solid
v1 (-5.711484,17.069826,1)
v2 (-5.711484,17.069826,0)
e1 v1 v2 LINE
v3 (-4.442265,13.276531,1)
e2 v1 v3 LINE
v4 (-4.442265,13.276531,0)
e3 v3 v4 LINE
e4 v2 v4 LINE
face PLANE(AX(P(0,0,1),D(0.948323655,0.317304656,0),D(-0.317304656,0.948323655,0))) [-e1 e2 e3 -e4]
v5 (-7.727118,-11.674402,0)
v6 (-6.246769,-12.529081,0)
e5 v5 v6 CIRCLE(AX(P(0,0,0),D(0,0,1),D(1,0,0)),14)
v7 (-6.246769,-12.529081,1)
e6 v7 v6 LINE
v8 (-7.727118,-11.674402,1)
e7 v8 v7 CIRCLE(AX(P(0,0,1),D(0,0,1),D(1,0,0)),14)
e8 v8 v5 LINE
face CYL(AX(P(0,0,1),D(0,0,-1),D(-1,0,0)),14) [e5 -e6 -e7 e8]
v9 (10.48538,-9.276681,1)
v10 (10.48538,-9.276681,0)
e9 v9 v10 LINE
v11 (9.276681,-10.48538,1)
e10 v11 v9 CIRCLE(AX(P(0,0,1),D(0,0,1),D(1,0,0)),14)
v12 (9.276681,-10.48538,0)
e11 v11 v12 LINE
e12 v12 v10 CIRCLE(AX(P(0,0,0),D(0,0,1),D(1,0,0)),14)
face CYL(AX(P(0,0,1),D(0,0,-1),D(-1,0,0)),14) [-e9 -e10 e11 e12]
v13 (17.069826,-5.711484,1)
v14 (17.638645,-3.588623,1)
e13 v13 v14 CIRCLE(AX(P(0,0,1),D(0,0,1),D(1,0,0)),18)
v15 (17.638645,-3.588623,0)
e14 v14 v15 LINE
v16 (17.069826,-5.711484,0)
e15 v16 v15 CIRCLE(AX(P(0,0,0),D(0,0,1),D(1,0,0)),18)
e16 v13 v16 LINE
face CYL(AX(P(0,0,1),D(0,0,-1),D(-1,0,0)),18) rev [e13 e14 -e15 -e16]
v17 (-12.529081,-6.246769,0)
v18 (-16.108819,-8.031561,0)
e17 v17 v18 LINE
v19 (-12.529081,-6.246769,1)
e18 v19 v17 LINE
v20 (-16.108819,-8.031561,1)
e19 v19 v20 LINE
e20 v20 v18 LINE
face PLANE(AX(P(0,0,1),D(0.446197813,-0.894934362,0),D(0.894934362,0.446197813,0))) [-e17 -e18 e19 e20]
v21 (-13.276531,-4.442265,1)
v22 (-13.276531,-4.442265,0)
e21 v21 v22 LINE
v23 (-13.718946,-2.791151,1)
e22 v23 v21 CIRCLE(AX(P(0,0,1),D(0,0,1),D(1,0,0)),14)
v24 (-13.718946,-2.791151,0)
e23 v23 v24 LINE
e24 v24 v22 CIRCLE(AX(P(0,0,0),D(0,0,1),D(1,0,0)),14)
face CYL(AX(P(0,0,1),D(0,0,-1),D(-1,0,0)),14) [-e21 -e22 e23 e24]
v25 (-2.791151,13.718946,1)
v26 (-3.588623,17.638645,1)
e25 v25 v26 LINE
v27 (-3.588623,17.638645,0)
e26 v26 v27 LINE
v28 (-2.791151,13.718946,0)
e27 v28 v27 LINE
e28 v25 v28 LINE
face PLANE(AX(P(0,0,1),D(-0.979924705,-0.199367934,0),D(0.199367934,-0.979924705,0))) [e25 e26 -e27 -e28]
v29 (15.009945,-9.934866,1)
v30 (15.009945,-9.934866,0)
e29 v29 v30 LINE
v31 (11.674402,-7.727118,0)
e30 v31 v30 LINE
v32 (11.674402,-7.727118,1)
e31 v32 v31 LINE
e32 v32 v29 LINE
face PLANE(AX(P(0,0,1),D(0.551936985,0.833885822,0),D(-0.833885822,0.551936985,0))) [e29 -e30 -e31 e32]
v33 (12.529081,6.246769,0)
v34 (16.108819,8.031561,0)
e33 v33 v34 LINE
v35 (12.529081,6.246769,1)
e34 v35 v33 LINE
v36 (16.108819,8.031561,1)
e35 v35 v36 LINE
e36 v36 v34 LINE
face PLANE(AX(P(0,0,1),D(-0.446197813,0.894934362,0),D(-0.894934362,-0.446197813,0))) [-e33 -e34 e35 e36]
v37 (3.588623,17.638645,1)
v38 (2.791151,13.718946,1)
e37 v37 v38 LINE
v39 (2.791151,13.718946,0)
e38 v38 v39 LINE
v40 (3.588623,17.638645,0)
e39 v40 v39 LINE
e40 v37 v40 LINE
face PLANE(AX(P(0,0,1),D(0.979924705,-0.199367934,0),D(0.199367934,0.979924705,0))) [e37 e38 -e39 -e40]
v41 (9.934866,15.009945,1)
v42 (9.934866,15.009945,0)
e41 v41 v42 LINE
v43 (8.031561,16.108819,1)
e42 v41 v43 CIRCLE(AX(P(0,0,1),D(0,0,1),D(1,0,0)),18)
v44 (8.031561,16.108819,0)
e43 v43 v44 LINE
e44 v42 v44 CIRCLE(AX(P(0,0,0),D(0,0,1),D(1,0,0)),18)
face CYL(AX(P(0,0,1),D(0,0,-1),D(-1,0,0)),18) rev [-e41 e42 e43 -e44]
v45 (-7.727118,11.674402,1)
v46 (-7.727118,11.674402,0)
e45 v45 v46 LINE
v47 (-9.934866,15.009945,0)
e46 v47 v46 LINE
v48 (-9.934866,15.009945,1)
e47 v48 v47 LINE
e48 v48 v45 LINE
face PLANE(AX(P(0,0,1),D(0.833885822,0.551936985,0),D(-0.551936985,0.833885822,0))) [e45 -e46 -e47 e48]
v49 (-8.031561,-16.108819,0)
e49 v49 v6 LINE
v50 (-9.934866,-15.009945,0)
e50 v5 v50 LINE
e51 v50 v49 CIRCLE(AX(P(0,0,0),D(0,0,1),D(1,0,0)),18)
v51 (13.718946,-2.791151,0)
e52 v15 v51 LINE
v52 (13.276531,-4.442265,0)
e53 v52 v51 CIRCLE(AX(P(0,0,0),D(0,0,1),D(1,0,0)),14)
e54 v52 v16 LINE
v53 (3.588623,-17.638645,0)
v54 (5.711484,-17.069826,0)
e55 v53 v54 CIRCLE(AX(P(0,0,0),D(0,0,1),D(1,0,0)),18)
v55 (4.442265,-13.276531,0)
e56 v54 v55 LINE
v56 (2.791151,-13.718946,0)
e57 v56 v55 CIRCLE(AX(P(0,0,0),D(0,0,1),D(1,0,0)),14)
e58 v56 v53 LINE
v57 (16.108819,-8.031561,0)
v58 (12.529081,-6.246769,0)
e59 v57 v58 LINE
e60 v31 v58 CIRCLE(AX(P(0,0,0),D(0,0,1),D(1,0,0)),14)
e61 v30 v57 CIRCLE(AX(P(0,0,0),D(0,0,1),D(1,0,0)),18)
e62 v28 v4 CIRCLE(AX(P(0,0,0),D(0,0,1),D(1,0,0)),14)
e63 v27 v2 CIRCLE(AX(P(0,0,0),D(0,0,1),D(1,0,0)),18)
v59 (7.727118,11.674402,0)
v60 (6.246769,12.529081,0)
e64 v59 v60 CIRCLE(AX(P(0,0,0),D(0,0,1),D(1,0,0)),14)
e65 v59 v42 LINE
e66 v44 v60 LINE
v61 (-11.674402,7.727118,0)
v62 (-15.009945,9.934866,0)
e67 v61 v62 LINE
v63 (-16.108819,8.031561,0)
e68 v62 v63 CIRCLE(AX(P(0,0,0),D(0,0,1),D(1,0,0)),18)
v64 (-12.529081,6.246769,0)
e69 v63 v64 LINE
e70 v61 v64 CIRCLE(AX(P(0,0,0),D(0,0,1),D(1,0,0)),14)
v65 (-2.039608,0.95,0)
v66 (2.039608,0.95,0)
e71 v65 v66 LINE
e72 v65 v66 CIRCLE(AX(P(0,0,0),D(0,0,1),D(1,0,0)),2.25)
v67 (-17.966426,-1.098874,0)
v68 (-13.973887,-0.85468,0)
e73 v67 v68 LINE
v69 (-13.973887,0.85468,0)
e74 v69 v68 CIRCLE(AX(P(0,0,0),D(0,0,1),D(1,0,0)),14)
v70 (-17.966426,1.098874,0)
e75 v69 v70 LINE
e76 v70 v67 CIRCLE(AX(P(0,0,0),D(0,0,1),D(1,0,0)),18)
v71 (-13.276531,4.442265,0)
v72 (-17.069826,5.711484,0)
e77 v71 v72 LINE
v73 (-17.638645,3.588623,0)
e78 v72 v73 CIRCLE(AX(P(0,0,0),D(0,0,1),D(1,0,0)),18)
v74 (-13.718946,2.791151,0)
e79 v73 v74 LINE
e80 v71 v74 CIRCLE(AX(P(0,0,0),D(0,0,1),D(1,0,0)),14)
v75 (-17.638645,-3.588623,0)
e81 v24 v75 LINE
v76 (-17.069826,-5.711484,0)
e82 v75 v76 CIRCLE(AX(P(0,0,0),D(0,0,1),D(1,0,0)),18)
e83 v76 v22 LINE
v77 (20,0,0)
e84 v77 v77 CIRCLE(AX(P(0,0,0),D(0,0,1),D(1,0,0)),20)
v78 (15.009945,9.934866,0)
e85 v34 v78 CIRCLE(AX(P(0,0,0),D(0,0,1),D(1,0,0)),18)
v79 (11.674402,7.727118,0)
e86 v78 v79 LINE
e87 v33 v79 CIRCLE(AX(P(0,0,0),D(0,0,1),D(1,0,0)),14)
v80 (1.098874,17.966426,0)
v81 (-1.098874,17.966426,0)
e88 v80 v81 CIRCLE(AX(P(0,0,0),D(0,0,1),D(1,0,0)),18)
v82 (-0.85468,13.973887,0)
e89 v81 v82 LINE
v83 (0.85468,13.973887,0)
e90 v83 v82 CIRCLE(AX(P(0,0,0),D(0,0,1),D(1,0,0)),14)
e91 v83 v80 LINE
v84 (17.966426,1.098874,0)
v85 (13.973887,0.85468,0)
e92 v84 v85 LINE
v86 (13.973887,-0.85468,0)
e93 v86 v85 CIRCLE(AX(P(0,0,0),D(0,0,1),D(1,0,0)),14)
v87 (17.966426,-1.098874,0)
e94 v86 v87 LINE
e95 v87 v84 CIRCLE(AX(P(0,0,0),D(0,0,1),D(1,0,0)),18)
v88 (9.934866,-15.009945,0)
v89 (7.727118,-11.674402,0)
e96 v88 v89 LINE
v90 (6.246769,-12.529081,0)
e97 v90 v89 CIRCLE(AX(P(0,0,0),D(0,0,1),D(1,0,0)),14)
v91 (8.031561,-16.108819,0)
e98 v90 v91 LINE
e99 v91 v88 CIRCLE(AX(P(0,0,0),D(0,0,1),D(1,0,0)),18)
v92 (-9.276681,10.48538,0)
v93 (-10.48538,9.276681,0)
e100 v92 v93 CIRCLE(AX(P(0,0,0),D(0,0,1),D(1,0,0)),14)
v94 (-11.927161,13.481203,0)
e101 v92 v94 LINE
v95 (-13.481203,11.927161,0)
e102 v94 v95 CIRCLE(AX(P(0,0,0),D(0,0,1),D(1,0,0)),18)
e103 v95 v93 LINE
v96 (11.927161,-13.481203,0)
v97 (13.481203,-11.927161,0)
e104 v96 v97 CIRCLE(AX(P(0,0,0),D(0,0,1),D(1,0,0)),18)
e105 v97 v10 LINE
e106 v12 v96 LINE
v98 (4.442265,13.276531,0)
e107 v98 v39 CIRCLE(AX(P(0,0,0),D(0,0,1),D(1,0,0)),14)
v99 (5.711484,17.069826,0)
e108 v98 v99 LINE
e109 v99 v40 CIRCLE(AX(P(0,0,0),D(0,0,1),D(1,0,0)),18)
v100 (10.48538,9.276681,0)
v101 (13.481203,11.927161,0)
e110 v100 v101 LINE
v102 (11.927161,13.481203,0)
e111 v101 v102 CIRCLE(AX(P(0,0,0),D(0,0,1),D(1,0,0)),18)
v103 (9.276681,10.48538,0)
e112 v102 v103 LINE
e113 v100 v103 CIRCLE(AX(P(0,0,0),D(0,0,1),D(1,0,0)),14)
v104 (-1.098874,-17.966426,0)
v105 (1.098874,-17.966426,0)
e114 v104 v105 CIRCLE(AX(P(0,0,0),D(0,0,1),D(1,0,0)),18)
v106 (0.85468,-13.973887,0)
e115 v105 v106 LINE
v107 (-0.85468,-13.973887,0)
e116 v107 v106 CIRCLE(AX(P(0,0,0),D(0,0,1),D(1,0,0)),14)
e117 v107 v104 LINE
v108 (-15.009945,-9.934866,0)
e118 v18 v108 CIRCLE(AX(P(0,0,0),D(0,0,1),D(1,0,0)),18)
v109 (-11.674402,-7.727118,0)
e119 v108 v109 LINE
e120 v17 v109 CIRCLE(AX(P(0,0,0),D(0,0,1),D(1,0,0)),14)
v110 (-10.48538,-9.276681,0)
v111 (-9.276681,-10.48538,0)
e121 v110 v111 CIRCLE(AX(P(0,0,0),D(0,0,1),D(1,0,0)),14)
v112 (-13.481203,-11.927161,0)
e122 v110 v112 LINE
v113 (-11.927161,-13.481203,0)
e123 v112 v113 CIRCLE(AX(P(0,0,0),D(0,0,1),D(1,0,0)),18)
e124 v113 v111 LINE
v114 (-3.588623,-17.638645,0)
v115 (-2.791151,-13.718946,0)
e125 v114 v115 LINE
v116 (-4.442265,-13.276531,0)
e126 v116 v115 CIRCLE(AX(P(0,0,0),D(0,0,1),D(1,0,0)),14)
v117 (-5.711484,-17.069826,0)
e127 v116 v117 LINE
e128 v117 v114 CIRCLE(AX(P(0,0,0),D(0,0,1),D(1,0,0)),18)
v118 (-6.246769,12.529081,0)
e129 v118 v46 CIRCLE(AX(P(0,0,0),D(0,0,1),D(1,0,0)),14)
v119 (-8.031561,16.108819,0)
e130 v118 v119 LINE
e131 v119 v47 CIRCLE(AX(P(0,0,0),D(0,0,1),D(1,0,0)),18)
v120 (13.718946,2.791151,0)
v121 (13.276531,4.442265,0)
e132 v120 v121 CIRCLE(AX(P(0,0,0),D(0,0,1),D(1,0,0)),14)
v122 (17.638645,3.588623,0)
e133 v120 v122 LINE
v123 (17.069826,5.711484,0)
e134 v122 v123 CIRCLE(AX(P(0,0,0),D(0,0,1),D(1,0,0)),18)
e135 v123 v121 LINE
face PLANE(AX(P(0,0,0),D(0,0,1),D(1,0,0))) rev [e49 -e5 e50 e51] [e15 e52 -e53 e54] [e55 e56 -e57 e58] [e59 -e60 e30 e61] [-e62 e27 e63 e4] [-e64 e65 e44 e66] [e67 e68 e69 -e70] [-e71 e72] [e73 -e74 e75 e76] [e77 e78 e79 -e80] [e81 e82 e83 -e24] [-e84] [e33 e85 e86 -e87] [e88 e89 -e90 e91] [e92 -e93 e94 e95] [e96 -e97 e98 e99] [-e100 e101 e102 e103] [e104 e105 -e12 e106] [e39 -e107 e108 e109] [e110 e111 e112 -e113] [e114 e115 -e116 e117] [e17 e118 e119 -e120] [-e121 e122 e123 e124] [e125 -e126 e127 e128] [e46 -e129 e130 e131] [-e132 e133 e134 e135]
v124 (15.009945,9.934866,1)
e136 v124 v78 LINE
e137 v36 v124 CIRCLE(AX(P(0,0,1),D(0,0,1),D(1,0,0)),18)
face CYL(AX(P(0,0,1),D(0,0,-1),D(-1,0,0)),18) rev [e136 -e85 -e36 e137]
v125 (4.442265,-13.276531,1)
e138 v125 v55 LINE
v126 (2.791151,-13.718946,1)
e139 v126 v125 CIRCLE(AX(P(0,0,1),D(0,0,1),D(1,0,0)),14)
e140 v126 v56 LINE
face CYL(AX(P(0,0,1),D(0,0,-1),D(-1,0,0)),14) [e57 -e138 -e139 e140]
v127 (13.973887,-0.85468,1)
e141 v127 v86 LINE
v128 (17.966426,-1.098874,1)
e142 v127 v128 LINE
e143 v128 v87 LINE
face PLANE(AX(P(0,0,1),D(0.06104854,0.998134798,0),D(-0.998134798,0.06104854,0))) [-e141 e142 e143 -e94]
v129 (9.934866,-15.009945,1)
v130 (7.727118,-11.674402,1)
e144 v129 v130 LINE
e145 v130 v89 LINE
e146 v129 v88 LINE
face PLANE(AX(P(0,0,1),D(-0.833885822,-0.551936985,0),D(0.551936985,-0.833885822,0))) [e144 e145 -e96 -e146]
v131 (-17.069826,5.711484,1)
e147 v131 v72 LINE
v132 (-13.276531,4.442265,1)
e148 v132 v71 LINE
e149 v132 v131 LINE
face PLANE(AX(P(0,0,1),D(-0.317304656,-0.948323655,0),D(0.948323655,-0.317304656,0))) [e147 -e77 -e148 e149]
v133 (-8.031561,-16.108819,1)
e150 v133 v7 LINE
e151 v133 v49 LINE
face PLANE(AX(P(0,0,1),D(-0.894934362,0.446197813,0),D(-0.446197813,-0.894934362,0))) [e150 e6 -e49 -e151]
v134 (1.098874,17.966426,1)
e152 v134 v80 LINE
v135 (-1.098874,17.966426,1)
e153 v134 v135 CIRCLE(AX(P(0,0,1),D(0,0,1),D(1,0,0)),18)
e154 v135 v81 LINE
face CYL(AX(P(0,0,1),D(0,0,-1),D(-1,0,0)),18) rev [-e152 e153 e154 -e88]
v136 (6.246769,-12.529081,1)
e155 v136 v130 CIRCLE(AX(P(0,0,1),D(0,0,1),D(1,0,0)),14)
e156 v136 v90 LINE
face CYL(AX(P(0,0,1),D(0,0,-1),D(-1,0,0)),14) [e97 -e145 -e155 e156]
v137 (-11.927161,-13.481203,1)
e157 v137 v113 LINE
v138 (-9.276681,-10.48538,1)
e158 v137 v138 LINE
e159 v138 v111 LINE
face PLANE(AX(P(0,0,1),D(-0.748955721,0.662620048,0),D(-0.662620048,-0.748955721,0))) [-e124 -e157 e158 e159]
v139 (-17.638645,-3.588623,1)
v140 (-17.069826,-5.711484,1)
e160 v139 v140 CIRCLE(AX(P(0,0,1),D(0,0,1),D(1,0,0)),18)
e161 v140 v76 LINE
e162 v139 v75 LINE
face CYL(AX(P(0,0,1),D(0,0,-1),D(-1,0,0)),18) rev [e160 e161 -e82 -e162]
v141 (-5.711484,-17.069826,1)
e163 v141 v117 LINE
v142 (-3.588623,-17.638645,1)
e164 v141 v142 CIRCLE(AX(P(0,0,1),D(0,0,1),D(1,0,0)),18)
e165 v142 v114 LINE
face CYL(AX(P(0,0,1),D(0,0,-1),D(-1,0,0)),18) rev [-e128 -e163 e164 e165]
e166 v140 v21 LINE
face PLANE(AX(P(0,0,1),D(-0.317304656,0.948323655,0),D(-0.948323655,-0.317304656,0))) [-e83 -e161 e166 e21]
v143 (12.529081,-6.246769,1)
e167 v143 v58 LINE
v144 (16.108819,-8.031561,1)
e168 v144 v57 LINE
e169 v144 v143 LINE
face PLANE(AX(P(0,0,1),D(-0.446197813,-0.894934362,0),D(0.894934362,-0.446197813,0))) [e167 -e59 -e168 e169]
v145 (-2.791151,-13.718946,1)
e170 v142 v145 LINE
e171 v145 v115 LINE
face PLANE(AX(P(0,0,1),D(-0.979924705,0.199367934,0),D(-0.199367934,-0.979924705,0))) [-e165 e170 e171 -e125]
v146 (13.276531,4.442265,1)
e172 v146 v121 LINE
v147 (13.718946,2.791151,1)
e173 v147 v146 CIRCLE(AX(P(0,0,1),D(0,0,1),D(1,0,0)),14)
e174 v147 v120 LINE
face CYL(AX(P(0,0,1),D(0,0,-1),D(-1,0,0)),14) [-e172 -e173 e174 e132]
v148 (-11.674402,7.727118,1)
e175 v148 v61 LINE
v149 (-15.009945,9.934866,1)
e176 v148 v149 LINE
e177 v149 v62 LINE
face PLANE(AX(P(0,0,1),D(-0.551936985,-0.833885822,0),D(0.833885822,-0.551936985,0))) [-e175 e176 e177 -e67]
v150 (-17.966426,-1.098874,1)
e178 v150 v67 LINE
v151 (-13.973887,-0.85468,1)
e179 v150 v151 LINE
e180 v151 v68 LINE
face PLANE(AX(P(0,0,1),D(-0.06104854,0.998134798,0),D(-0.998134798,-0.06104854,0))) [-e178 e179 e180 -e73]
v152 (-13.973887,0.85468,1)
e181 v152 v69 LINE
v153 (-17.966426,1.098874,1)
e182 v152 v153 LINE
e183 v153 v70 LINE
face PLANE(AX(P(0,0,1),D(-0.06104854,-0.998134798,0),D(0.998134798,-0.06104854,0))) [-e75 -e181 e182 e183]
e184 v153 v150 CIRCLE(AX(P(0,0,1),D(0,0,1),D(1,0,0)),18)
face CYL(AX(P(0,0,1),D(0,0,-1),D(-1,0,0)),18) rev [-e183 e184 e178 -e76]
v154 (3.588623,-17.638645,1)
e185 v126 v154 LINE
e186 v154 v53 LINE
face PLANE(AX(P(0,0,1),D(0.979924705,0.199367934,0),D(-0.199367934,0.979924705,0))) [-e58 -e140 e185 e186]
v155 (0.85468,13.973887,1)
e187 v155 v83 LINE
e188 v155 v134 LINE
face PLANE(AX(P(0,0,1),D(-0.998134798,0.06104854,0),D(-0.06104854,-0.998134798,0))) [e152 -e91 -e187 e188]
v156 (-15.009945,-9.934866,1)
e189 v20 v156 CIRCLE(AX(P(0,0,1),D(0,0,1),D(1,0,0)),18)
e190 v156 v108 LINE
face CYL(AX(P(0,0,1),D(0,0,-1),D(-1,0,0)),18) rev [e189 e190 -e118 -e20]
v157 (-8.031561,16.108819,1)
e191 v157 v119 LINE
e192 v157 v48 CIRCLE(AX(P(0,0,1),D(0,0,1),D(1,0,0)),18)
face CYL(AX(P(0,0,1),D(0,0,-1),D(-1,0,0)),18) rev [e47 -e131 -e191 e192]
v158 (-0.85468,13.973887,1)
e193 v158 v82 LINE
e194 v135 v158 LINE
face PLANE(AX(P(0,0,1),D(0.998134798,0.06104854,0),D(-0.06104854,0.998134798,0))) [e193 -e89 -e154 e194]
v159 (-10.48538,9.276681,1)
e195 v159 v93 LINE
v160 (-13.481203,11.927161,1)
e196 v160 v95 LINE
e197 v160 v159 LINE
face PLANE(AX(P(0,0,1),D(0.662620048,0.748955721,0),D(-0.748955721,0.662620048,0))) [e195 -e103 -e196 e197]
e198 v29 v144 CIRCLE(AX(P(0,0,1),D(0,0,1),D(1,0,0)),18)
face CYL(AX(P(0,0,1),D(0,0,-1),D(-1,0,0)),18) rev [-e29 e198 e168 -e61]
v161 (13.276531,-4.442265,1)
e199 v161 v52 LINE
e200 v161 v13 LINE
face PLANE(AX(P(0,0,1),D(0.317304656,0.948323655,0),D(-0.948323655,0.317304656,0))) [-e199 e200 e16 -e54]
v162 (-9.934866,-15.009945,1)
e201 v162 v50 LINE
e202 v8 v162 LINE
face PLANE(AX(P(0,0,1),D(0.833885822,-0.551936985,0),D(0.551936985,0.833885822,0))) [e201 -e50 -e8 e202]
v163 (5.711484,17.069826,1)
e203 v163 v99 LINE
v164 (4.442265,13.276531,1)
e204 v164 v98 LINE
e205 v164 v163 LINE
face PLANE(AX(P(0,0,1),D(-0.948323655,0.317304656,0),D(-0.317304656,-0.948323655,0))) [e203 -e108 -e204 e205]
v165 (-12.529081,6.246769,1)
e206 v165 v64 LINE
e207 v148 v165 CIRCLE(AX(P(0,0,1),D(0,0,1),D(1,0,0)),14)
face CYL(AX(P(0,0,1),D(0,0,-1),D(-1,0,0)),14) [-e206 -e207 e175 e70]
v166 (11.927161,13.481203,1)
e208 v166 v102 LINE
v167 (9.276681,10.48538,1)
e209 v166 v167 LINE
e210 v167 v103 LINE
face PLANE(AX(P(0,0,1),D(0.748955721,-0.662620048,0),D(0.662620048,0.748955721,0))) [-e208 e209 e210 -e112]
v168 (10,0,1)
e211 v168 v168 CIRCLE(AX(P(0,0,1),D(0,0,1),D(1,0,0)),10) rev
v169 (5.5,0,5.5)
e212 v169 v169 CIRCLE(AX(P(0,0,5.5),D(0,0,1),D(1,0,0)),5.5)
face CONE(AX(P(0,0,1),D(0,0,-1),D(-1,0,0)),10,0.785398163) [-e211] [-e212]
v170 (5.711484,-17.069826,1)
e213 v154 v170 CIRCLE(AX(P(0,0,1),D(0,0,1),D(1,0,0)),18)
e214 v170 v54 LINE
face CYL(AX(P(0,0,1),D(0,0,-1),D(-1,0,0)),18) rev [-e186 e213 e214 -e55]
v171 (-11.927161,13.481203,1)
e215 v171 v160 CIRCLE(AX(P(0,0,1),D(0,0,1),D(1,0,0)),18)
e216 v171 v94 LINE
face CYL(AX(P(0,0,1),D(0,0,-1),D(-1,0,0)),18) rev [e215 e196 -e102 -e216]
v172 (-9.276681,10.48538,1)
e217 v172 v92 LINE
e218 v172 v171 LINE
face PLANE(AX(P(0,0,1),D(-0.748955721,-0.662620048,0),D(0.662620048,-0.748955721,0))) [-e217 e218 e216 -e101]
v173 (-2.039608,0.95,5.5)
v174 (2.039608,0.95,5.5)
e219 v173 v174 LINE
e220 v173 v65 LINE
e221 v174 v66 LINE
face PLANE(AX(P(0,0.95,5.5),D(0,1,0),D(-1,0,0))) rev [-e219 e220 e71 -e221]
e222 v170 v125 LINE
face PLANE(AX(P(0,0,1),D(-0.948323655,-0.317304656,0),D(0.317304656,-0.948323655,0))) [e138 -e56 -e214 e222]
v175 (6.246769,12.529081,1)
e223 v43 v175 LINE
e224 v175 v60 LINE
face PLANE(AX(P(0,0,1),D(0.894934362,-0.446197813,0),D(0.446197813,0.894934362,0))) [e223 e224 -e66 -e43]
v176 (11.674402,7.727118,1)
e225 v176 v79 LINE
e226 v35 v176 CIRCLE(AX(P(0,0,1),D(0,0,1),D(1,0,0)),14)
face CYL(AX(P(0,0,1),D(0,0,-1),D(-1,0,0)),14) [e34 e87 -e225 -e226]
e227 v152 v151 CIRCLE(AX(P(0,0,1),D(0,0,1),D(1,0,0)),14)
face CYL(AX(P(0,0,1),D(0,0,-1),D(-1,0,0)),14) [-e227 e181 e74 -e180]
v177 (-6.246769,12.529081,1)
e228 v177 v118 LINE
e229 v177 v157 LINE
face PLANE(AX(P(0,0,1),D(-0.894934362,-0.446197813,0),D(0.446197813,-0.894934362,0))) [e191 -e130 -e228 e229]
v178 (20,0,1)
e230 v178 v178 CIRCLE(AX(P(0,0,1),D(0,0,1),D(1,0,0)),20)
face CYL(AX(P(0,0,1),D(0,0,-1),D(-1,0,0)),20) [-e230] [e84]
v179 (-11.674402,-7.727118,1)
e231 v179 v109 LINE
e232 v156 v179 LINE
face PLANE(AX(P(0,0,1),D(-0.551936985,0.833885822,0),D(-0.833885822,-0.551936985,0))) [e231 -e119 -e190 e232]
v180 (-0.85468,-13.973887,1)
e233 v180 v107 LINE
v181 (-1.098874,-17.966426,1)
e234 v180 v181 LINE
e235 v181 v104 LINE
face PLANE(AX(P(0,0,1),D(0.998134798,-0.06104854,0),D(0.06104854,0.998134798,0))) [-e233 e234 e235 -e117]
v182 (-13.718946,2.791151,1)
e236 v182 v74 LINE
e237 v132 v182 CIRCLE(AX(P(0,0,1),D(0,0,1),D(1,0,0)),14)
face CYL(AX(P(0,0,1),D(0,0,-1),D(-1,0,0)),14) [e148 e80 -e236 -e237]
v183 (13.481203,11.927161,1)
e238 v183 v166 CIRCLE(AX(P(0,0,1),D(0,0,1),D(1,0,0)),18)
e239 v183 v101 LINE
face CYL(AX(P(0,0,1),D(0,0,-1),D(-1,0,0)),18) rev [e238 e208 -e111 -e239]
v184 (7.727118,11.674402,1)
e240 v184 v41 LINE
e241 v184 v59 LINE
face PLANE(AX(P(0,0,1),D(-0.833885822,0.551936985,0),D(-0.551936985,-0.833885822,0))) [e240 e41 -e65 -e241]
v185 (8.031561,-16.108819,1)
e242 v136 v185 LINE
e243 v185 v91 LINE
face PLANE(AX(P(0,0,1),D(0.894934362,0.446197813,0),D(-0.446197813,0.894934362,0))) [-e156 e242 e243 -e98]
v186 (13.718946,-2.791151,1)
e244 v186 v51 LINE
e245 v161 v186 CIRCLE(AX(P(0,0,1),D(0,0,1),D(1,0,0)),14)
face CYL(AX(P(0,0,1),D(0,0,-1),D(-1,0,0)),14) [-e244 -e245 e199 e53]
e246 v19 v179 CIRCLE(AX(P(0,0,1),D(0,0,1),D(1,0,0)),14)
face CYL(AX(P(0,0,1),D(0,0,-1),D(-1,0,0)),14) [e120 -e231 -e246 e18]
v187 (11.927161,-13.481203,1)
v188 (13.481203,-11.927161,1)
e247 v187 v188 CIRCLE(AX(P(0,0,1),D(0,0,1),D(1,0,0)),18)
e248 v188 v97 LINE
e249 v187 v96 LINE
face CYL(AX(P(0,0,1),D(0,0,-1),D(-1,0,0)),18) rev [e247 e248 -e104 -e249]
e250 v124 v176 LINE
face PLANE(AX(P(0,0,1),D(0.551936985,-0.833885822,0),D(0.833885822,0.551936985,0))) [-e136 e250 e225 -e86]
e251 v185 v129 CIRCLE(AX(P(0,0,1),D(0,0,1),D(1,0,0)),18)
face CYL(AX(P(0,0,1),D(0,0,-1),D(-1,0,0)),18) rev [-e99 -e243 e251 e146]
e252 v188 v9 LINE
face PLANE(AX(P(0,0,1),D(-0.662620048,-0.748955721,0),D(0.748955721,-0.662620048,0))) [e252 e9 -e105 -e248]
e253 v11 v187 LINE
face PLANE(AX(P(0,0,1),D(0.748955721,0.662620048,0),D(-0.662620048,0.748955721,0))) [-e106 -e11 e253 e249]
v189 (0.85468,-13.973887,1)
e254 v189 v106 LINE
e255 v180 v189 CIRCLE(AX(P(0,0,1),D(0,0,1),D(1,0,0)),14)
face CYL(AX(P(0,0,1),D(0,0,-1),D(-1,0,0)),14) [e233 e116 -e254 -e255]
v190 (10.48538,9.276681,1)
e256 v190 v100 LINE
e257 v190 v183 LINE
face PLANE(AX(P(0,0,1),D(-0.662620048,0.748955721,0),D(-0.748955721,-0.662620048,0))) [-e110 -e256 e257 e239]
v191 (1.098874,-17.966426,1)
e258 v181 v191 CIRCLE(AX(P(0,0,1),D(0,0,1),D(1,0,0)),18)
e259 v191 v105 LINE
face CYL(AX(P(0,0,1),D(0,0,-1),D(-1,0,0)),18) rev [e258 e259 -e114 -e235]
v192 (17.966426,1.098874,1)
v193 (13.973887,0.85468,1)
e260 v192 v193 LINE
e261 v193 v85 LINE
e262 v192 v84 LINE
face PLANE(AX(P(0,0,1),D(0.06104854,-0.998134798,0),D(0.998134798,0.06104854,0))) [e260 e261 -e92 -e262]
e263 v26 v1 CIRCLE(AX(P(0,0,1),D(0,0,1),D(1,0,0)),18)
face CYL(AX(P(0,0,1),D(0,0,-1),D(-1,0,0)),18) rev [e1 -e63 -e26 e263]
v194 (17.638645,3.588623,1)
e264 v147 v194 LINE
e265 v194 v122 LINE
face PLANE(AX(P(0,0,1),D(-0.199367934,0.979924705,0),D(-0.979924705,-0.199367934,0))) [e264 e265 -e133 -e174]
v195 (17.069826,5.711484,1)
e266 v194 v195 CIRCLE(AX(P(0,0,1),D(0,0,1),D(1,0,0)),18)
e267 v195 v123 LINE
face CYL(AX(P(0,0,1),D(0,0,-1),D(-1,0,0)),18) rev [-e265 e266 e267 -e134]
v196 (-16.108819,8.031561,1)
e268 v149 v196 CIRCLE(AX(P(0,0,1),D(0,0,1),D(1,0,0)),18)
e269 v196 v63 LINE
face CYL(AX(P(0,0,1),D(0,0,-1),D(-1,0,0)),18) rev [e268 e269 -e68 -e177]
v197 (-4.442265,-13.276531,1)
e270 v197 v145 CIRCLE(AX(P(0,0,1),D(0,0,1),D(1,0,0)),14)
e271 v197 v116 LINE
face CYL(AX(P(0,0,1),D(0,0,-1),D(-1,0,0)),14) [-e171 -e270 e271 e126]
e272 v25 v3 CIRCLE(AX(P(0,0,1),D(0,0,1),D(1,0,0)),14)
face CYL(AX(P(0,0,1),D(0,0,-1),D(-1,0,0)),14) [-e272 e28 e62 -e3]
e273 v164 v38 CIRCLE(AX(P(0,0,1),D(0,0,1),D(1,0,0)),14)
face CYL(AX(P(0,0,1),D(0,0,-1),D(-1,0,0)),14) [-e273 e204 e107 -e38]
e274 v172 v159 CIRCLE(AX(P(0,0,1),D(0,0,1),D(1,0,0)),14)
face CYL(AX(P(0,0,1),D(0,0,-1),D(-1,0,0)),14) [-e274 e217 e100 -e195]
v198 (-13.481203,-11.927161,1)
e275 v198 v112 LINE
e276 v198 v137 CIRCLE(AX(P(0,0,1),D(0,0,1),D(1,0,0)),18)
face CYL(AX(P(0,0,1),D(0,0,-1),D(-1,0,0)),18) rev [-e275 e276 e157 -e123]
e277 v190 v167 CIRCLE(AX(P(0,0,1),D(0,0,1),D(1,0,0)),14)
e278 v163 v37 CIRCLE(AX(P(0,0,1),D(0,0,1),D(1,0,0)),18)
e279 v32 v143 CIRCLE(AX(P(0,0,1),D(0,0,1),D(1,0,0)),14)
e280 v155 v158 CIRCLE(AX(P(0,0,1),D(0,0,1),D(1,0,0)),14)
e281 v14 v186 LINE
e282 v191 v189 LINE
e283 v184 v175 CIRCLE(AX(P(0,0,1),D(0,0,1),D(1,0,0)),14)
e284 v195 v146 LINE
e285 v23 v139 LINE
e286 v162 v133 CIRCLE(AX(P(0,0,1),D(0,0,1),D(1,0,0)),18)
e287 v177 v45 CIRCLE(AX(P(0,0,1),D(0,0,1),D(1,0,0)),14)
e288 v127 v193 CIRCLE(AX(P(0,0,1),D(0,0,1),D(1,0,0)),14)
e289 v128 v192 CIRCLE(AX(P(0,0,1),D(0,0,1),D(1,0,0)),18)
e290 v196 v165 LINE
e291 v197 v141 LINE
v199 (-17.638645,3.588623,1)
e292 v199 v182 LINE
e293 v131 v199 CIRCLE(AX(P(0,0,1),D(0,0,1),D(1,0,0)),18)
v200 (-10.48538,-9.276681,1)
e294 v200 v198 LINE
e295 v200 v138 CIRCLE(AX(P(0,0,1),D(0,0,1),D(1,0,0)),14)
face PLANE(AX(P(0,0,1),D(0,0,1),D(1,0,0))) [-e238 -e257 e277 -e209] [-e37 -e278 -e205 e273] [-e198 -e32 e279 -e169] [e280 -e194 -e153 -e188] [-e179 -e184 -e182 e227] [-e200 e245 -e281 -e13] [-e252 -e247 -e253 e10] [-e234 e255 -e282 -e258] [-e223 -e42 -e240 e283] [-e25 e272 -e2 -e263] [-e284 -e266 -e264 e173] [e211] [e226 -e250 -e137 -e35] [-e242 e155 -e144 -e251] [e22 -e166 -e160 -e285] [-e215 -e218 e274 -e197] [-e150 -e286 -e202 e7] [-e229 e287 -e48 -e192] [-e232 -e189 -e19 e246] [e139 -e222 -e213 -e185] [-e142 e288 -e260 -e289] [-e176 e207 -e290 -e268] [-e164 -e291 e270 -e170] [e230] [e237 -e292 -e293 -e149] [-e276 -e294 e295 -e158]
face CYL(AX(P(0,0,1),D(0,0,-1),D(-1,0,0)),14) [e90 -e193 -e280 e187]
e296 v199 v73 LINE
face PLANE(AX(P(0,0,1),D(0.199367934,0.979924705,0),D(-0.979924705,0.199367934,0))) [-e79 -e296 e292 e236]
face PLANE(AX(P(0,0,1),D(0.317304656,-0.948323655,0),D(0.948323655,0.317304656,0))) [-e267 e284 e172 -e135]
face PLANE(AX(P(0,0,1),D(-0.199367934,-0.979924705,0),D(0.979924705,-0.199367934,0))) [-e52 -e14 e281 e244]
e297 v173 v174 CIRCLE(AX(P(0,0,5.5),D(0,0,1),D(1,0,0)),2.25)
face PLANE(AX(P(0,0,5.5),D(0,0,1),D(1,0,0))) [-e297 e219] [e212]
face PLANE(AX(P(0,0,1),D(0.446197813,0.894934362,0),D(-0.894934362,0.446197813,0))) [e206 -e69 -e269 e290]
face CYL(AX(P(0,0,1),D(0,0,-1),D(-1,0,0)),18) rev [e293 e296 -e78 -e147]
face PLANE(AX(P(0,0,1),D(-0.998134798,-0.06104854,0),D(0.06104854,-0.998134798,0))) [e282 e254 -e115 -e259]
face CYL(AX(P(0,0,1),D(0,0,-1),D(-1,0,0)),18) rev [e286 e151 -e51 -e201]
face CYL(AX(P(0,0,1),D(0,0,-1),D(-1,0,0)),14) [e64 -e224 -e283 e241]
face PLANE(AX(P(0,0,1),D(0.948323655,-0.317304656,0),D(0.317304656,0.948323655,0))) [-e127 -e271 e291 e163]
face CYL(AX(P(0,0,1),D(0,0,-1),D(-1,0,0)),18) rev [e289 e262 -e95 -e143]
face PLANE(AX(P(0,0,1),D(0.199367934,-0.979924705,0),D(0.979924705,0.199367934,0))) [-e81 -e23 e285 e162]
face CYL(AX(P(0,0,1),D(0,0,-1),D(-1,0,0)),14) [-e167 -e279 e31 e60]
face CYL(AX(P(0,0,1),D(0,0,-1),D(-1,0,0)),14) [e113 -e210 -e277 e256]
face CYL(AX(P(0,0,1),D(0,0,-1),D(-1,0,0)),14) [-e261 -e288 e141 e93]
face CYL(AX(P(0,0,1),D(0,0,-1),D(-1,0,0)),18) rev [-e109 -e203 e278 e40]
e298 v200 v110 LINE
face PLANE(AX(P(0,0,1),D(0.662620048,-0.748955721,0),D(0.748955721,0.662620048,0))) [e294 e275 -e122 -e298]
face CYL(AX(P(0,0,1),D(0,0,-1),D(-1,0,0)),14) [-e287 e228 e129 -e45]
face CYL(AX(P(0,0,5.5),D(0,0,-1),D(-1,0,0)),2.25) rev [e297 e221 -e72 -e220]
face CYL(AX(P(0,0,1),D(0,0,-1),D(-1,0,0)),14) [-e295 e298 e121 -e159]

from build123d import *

# Parameters (mm, degrees)
CROQUIS2_R              = 20
SALIENTE_EXTRUIR2_DEPTH = 1
CROQUIS2_5_R            = 5
SALIENTE_EXTRUIR3_DEPTH = 5.5
CHAFL_N1_SIZE           = 5
CORTAR_EXTRUIR1_DEPTH   = 29.814059068


with BuildPart() as part:
    # Croquis2 → Saliente-Extruir2 (new body)
    with BuildSketch(Plane.XY):
        Circle(CROQUIS2_R)
        with BuildLine():
            Line((-2.039607805, 0.95), (2.039607805, 0.95))
            ThreePointArc((2.039607805, 0.95), (0, -2.25), (-2.039607805, 0.95))
        make_face(mode=Mode.SUBTRACT)
        with BuildLine():
            Line((-0.854679553, 13.973887178), (-1.098873712, 17.966426372))
            ThreePointArc((-1.098873712, 17.966426372), (0, 18), (1.098873712, 17.966426372))
            Line((1.098873712, 17.966426372), (0.854679553, 13.973887178))
            ThreePointArc((0.854679553, 13.973887178), (0, 14), (-0.854679553, 13.973887178))
        make_face(mode=Mode.SUBTRACT)
        with BuildLine():
            Line((-3.58862282, 17.638644683), (-2.791151082, 13.718945865))
            ThreePointArc((-2.791151082, 13.718945865), (-3.623466631, 13.522961568), (-4.44226519, 13.276531173))
            Line((-4.44226519, 13.276531173), (-5.711483815, 17.069825794))
            ThreePointArc((-5.711483815, 17.069825794), (-4.658742812, 17.386664873), (-3.58862282, 17.638644683))
        make_face(mode=Mode.SUBTRACT)
        with BuildLine():
            Line((-8.031560636, 16.108818509), (-6.246769384, 12.529081062))
            ThreePointArc((-6.246769384, 12.529081062), (-7, 12.124355653), (-7.727117794, 11.674401509))
            Line((-7.727117794, 11.674401509), (-9.934865736, 15.009944797))
            ThreePointArc((-9.934865736, 15.009944797), (-9, 15.588457268), (-8.031560636, 16.108818509))
        make_face(mode=Mode.SUBTRACT)
        with BuildLine():
            Line((-11.927160868, 13.481202974), (-9.276680675, 10.485380091))
            ThreePointArc((-9.276680675, 10.485380091), (-9.899494937, 9.899494937), (-10.485380091, 9.276680675))
            Line((-10.485380091, 9.276680675), (-13.481202974, 11.927160868))
            ThreePointArc((-13.481202974, 11.927160868), (-12.727922061, 12.727922061), (-11.927160868, 13.481202974))
        make_face(mode=Mode.SUBTRACT)
        with BuildLine():
            Line((-15.009944797, 9.934865736), (-11.674401509, 7.727117794))
            ThreePointArc((-11.674401509, 7.727117794), (-12.124355653, 7), (-12.529081062, 6.246769384))
            Line((-12.529081062, 6.246769384), (-16.108818509, 8.031560636))
            ThreePointArc((-16.108818509, 8.031560636), (-15.588457268, 9), (-15.009944797, 9.934865736))
        make_face(mode=Mode.SUBTRACT)
        with BuildLine():
            Line((-17.069825794, 5.711483815), (-13.276531173, 4.44226519))
            ThreePointArc((-13.276531173, 4.44226519), (-13.522961568, 3.623466631), (-13.718945865, 2.791151082))
            Line((-13.718945865, 2.791151082), (-17.638644683, 3.58862282))
            ThreePointArc((-17.638644683, 3.58862282), (-17.386664873, 4.658742812), (-17.069825794, 5.711483815))
        make_face(mode=Mode.SUBTRACT)
        with BuildLine():
            Line((-17.966426372, 1.098873712), (-13.973887178, 0.854679553))
            ThreePointArc((-13.973887178, 0.854679553), (-14, 0), (-13.973887178, -0.854679553))
            Line((-13.973887178, -0.854679553), (-17.966426372, -1.098873712))
            ThreePointArc((-17.966426372, -1.098873712), (-18, 0), (-17.966426372, 1.098873712))
        make_face(mode=Mode.SUBTRACT)
        with BuildLine():
            Line((-17.638644683, -3.58862282), (-13.718945865, -2.791151082))
            ThreePointArc((-13.718945865, -2.791151082), (-13.522961568, -3.623466631), (-13.276531173, -4.44226519))
            Line((-13.276531173, -4.44226519), (-17.069825794, -5.711483815))
            ThreePointArc((-17.069825794, -5.711483815), (-17.386664873, -4.658742812), (-17.638644683, -3.58862282))
        make_face(mode=Mode.SUBTRACT)
        with BuildLine():
            Line((-16.108818509, -8.031560636), (-12.529081062, -6.246769384))
            ThreePointArc((-12.529081062, -6.246769384), (-12.124355653, -7), (-11.674401509, -7.727117794))
            Line((-11.674401509, -7.727117794), (-15.009944797, -9.934865736))
            ThreePointArc((-15.009944797, -9.934865736), (-15.588457268, -9), (-16.108818509, -8.031560636))
        make_face(mode=Mode.SUBTRACT)
        with BuildLine():
            Line((-13.481202974, -11.927160868), (-10.485380091, -9.276680675))
            ThreePointArc((-10.485380091, -9.276680675), (-9.899494937, -9.899494937), (-9.276680675, -10.485380091))
            Line((-9.276680675, -10.485380091), (-11.927160868, -13.481202974))
            ThreePointArc((-11.927160868, -13.481202974), (-12.727922061, -12.727922061), (-13.481202974, -11.927160868))
        make_face(mode=Mode.SUBTRACT)
        with BuildLine():
            Line((-9.934865736, -15.009944797), (-7.727117794, -11.674401509))
            ThreePointArc((-7.727117794, -11.674401509), (-7, -12.124355653), (-6.246769384, -12.529081062))
            Line((-6.246769384, -12.529081062), (-8.031560636, -16.108818509))
            ThreePointArc((-8.031560636, -16.108818509), (-9, -15.588457268), (-9.934865736, -15.009944797))
        make_face(mode=Mode.SUBTRACT)
        with BuildLine():
            Line((-5.711483815, -17.069825794), (-4.44226519, -13.276531173))
            ThreePointArc((-4.44226519, -13.276531173), (-3.623466631, -13.522961568), (-2.791151082, -13.718945865))
            Line((-2.791151082, -13.718945865), (-3.58862282, -17.638644683))
            ThreePointArc((-3.58862282, -17.638644683), (-4.658742812, -17.386664873), (-5.711483815, -17.069825794))
        make_face(mode=Mode.SUBTRACT)
        with BuildLine():
            Line((-1.098873712, -17.966426372), (-0.854679553, -13.973887178))
            ThreePointArc((-0.854679553, -13.973887178), (0, -14), (0.854679553, -13.973887178))
            Line((0.854679553, -13.973887178), (1.098873712, -17.966426372))
            ThreePointArc((1.098873712, -17.966426372), (0, -18), (-1.098873712, -17.966426372))
        make_face(mode=Mode.SUBTRACT)
        with BuildLine():
            Line((3.58862282, -17.638644683), (2.791151082, -13.718945865))
            ThreePointArc((2.791151082, -13.718945865), (3.623466631, -13.522961568), (4.44226519, -13.276531173))
            Line((4.44226519, -13.276531173), (5.711483815, -17.069825794))
            ThreePointArc((5.711483815, -17.069825794), (4.658742812, -17.386664873), (3.58862282, -17.638644683))
        make_face(mode=Mode.SUBTRACT)
        with BuildLine():
            Line((8.031560636, -16.108818509), (6.246769384, -12.529081062))
            ThreePointArc((6.246769384, -12.529081062), (7, -12.124355653), (7.727117794, -11.674401509))
            Line((7.727117794, -11.674401509), (9.934865736, -15.009944797))
            ThreePointArc((9.934865736, -15.009944797), (9, -15.588457268), (8.031560636, -16.108818509))
        make_face(mode=Mode.SUBTRACT)
        with BuildLine():
            Line((11.927160868, -13.481202974), (9.276680675, -10.485380091))
            ThreePointArc((9.276680675, -10.485380091), (9.899494937, -9.899494937), (10.485380091, -9.276680675))
            Line((10.485380091, -9.276680675), (13.481202974, -11.927160868))
            ThreePointArc((13.481202974, -11.927160868), (12.727922061, -12.727922061), (11.927160868, -13.481202974))
        make_face(mode=Mode.SUBTRACT)
        with BuildLine():
            Line((15.009944797, -9.934865736), (11.674401509, -7.727117794))
            ThreePointArc((11.674401509, -7.727117794), (12.124355653, -7), (12.529081062, -6.246769384))
            Line((12.529081062, -6.246769384), (16.108818509, -8.031560636))
            ThreePointArc((16.108818509, -8.031560636), (15.588457268, -9), (15.009944797, -9.934865736))
        make_face(mode=Mode.SUBTRACT)
        with BuildLine():
            Line((17.069825794, -5.711483815), (13.276531173, -4.44226519))
            ThreePointArc((13.276531173, -4.44226519), (13.522961568, -3.623466631), (13.718945865, -2.791151082))
            Line((13.718945865, -2.791151082), (17.638644683, -3.58862282))
            ThreePointArc((17.638644683, -3.58862282), (17.386664873, -4.658742812), (17.069825794, -5.711483815))
        make_face(mode=Mode.SUBTRACT)
        with BuildLine():
            Line((17.966426372, -1.098873712), (13.973887178, -0.854679553))
            ThreePointArc((13.973887178, -0.854679553), (14, 0), (13.973887178, 0.854679553))
            Line((13.973887178, 0.854679553), (17.966426372, 1.098873712))
            ThreePointArc((17.966426372, 1.098873712), (18, 0), (17.966426372, -1.098873712))
        make_face(mode=Mode.SUBTRACT)
        with BuildLine():
            Line((17.638644683, 3.58862282), (13.718945865, 2.791151082))
            ThreePointArc((13.718945865, 2.791151082), (13.522961568, 3.623466631), (13.276531173, 4.44226519))
            Line((13.276531173, 4.44226519), (17.069825794, 5.711483815))
            ThreePointArc((17.069825794, 5.711483815), (17.386664873, 4.658742812), (17.638644683, 3.58862282))
        make_face(mode=Mode.SUBTRACT)
        with BuildLine():
            Line((16.108818509, 8.031560636), (12.529081062, 6.246769384))
            ThreePointArc((12.529081062, 6.246769384), (12.124355653, 7), (11.674401509, 7.727117794))
            Line((11.674401509, 7.727117794), (15.009944797, 9.934865736))
            ThreePointArc((15.009944797, 9.934865736), (15.588457268, 9), (16.108818509, 8.031560636))
        make_face(mode=Mode.SUBTRACT)
        with BuildLine():
            Line((13.481202974, 11.927160868), (10.485380091, 9.276680675))
            ThreePointArc((10.485380091, 9.276680675), (9.899494937, 9.899494937), (9.276680675, 10.485380091))
            Line((9.276680675, 10.485380091), (11.927160868, 13.481202974))
            ThreePointArc((11.927160868, 13.481202974), (12.727922061, 12.727922061), (13.481202974, 11.927160868))
        make_face(mode=Mode.SUBTRACT)
        with BuildLine():
            Line((9.934865736, 15.009944797), (7.727117794, 11.674401509))
            ThreePointArc((7.727117794, 11.674401509), (7, 12.124355653), (6.246769384, 12.529081062))
            Line((6.246769384, 12.529081062), (8.031560636, 16.108818509))
            ThreePointArc((8.031560636, 16.108818509), (9, 15.588457268), (9.934865736, 15.009944797))
        make_face(mode=Mode.SUBTRACT)
        with BuildLine():
            Line((5.711483815, 17.069825794), (4.44226519, 13.276531173))
            ThreePointArc((4.44226519, 13.276531173), (3.623466631, 13.522961568), (2.791151082, 13.718945865))
            Line((2.791151082, 13.718945865), (3.58862282, 17.638644683))
            ThreePointArc((3.58862282, 17.638644683), (4.658742812, 17.386664873), (5.711483815, 17.069825794))
        make_face(mode=Mode.SUBTRACT)
    extrude(amount=SALIENTE_EXTRUIR2_DEPTH)

    # Croquis2<5> → Saliente-Extruir3 (add)
    with BuildSketch(Plane.XY):
        Circle(CROQUIS2_5_R)
    extrude(amount=SALIENTE_EXTRUIR3_DEPTH)

    # Chaflán1
    # the kernel refuses this chamfer: 5 mm, written as the material it adds along each edge
    with BuildSketch(Plane(origin=(0, 0, 1), x_dir=(1, 0, 0), z_dir=(0, 1, 0))) as chafl_n1_piece_1_section:
        Polygon((5 + CHAFL_N1_SIZE, 0), (5, -CHAFL_N1_SIZE), (5, 0), align=None)
    chafl_n1_piece_1 = revolve(axis=Axis((0, 0, 1), (0, 0, -1)), mode=Mode.PRIVATE)
    chafl_n1_piece_1 = split(chafl_n1_piece_1, bisect_by=Plane(origin=(-7.762197096, 0, 5.5), z_dir=(0, 0, -1)), keep=Keep.TOP, mode=Mode.PRIVATE)
    add(chafl_n1_piece_1)

    # Croquis2<6> → Cortar-Extruir1 (cut, through all)
    with BuildSketch(Plane.XY):
        with BuildLine():
            Line((2.039607805, 0.95), (-2.039607805, 0.95))
            ThreePointArc((-2.039607805, 0.95), (-0.486509218, -2.196772355), (2.25, 0))
            ThreePointArc((2.25, 0), (2.196772355, 0.486509218), (2.039607805, 0.95))
        make_face()
    extrude(amount=CORTAR_EXTRUIR1_DEPTH, mode=Mode.SUBTRACT)


solid = part.part
